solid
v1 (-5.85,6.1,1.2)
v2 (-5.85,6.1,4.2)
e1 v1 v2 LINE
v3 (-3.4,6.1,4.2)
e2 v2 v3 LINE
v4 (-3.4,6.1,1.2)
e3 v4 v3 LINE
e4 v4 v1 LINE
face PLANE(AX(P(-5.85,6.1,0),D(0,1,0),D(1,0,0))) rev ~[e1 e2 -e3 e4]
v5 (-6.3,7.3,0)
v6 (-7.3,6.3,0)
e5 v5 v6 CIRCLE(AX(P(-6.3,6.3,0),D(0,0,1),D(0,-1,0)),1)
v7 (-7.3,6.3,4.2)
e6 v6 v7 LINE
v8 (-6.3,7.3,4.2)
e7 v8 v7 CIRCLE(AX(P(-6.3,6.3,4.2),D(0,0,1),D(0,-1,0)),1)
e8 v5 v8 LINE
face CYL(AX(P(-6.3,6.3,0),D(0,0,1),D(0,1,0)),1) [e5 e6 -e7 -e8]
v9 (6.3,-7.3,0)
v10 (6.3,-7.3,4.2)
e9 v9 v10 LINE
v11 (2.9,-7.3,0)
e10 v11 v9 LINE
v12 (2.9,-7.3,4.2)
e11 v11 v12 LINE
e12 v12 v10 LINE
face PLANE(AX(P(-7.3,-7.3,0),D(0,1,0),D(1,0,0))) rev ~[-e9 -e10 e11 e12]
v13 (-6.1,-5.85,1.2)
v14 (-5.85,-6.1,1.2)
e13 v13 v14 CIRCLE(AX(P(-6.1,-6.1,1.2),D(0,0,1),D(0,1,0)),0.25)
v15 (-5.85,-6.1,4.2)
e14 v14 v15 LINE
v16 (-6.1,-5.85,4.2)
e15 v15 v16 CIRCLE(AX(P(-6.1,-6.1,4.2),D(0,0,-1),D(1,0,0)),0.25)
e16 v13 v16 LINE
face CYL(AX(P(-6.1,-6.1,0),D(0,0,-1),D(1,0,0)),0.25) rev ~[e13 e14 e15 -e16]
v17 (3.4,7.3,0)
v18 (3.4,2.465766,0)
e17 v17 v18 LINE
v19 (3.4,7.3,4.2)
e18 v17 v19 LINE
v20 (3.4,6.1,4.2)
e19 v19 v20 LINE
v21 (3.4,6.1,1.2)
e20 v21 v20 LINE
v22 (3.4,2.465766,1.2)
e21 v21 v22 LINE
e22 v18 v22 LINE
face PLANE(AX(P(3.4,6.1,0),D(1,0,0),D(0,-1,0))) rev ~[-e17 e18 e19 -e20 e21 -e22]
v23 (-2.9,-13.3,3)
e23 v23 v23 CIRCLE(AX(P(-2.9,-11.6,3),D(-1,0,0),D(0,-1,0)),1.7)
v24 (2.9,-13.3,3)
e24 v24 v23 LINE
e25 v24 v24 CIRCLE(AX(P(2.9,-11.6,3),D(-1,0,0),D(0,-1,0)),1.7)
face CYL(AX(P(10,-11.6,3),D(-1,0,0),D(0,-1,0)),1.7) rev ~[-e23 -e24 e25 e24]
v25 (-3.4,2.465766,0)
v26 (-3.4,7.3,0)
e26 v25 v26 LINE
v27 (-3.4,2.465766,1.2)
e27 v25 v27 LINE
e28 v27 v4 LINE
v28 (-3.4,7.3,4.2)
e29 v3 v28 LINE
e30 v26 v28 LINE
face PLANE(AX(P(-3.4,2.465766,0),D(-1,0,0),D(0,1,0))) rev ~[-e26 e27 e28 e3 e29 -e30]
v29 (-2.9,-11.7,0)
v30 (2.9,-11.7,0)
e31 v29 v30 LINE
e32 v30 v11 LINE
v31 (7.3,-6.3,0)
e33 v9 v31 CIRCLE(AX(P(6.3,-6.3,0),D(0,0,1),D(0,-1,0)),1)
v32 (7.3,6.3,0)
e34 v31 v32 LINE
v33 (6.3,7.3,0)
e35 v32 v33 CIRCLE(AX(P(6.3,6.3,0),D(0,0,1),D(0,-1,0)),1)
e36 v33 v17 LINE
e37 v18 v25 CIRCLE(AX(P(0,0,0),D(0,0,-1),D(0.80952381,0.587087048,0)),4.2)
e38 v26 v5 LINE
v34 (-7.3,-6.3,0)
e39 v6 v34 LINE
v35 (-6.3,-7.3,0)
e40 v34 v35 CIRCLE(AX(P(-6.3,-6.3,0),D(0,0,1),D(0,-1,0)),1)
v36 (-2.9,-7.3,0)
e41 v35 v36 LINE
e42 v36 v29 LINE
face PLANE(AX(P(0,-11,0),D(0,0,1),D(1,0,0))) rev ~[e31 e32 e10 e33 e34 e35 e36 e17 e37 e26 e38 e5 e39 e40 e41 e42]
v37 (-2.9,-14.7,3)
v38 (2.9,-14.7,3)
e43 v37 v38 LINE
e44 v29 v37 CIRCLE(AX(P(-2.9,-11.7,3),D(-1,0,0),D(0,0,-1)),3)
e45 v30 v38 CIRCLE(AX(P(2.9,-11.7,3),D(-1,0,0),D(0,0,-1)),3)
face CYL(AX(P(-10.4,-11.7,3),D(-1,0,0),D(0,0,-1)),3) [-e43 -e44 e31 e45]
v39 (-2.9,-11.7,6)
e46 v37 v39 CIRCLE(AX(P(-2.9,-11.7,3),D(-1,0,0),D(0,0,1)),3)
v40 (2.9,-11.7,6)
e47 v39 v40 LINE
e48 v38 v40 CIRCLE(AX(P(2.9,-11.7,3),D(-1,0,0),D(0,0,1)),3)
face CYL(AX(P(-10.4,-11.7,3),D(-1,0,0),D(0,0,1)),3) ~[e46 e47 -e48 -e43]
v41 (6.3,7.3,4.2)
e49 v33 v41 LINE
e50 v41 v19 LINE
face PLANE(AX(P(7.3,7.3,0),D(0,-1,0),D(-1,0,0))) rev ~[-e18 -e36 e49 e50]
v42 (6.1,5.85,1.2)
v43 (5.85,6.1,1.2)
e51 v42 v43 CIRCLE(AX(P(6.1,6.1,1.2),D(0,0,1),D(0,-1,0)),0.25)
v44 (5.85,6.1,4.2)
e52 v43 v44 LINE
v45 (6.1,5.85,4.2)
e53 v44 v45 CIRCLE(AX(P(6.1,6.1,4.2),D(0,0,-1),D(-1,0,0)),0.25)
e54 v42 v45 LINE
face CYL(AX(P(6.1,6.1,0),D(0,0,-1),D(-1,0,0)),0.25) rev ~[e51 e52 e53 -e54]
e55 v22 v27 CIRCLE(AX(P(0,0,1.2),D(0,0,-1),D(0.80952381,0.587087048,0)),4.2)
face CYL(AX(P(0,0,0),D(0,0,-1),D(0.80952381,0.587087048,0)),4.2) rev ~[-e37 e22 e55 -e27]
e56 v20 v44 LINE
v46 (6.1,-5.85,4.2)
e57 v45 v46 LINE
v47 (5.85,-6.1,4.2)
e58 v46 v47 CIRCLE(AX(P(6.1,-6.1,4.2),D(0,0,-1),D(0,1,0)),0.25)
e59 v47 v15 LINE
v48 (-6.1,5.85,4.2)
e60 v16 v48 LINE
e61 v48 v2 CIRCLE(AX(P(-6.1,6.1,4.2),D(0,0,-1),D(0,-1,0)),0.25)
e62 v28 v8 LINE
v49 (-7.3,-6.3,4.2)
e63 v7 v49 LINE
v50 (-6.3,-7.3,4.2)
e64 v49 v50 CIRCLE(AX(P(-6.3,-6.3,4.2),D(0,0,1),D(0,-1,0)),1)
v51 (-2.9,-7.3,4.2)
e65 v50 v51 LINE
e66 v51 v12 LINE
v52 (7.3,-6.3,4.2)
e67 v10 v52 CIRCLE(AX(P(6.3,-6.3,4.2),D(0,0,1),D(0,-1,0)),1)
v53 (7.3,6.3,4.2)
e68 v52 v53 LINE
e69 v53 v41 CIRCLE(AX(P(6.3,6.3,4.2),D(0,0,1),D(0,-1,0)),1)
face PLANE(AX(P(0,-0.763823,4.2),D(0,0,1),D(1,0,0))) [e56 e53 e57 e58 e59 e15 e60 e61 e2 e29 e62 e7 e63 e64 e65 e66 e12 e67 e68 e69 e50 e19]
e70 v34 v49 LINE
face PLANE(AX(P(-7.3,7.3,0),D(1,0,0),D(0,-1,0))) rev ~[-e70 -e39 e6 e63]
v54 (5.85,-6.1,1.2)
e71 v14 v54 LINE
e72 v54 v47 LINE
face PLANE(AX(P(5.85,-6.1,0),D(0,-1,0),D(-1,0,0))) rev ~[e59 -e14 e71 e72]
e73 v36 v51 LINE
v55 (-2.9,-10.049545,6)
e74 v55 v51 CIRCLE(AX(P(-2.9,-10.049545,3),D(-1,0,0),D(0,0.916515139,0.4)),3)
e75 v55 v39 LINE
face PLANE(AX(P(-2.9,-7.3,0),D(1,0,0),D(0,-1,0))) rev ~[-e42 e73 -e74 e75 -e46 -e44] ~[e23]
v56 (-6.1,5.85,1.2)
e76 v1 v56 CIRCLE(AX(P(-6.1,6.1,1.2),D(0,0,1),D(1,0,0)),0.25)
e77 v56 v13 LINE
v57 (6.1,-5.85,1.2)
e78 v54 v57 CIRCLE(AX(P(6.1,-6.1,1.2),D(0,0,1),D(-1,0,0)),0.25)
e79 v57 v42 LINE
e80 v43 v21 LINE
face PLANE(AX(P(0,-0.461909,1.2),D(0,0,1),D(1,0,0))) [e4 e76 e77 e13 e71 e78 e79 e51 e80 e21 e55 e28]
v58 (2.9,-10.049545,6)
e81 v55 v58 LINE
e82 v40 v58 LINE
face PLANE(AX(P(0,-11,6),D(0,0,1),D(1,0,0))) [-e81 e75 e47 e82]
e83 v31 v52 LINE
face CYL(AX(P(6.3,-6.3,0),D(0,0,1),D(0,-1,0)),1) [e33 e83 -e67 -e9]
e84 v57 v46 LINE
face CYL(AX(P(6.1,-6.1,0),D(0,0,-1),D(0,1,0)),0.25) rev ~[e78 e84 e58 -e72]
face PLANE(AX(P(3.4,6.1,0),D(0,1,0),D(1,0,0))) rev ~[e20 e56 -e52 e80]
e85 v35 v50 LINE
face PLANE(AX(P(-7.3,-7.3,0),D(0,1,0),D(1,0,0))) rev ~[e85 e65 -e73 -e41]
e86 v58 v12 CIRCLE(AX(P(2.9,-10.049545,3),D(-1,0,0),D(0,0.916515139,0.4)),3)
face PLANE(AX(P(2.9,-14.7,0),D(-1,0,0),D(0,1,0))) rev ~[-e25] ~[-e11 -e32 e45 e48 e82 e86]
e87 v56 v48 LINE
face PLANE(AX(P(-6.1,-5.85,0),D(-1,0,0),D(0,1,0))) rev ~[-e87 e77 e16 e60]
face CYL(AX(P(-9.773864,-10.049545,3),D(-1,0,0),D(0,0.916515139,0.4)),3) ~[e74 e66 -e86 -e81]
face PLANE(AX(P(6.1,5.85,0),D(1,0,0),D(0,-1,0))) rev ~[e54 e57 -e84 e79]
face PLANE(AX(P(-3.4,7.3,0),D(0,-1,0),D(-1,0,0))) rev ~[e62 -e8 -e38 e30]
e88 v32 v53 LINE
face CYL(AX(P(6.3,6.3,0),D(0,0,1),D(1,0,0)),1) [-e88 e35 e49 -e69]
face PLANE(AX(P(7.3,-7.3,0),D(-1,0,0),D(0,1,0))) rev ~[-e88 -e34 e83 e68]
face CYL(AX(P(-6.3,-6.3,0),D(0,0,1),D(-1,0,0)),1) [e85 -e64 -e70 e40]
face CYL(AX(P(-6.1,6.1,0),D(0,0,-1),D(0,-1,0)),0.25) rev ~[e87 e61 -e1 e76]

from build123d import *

# Parameters (mm, degrees)
F1_DEPTH    = 1.2
F2_DEPTH    = 4.2
F3_DEPTH    = 6
F6_T1_DEPTH = 20.8
F6_T3_DEPTH = 19.5477270849
F7_D        = 3.4
F7_DEPTH    = 7
F7_TIP      = 1.0214630523
F8_R        = 1


# Not quite as in the source:
# - a fillet or chamfer that OpenCascade refuses, or shapes differently, is made with other operations: its cross-section is extruded or revolved along the edge and cut away or added


with BuildPart() as f1:
    # F0 (on Top) → F1 (new body)
    with BuildSketch(Plane.XY):
        with BuildLine():
            Line((-3.4, 6.1), (-5.85, 6.1))
            ThreePointArc((-5.85, 6.1), (-6.2767766953, 6.2767766953), (-6.1, 5.85))
            Line((-6.1, 5.85), (-6.1, -5.85))
            ThreePointArc((-6.1, -5.85), (-6.2767766953, -6.2767766953), (-5.85, -6.1))
            Line((-5.85, -6.1), (5.85, -6.1))
            ThreePointArc((5.85, -6.1), (6.2767766953, -6.2767766953), (6.1, -5.85))
            Line((6.1, -5.85), (6.1, 5.85))
            ThreePointArc((6.1, 5.85), (6.2767766953, 6.2767766953), (5.85, 6.1))
            Line((5.85, 6.1), (3.4, 6.1))
            Line((3.4, 6.1), (3.4, 2.4657656012))
            ThreePointArc((3.4, 2.4657656012), (0, -4.2), (-3.4, 2.4657656012))
            Line((-3.4, 2.4657656012), (-3.4, 6.1))
        make_face()
    extrude(amount=F1_DEPTH)

    # F0 (on Top) → F2 (join)
    with BuildSketch(Plane.XY):
        with BuildLine():
            ThreePointArc((-6.1, 5.85), (-6.2767766953, 6.2767766953), (-5.85, 6.1))
            Line((-5.85, 6.1), (-3.4, 6.1))
            Line((-3.4, 6.1), (-3.4, 7.3))
            Line((-3.4, 7.3), (-7.3, 7.3))
            Line((-7.3, 7.3), (-7.3, -7.3))
            Line((-7.3, -7.3), (-2.9, -7.3))
            Line((-2.9, -7.3), (2.9, -7.3))
            Line((2.9, -7.3), (7.3, -7.3))
            Line((7.3, -7.3), (7.3, 7.3))
            Line((7.3, 7.3), (3.4, 7.3))
            Line((3.4, 7.3), (3.4, 6.1))
            Line((3.4, 6.1), (5.85, 6.1))
            ThreePointArc((5.85, 6.1), (6.2767766953, 6.2767766953), (6.1, 5.85))
            Line((6.1, 5.85), (6.1, -5.85))
            ThreePointArc((6.1, -5.85), (6.2767766953, -6.2767766953), (5.85, -6.1))
            Line((5.85, -6.1), (-5.85, -6.1))
            ThreePointArc((-5.85, -6.1), (-6.2767766953, -6.2767766953), (-6.1, -5.85))
            Line((-6.1, -5.85), (-6.1, 5.85))
        make_face()
    extrude(amount=F2_DEPTH)

    # F0 (on Top) → F3 (join)
    with BuildSketch(Plane.XY):
        Polygon((2.9, -7.3), (-2.9, -7.3), (-2.9, -14.7), (0, -14.7), (2.9, -14.7), align=None)
    extrude(amount=F3_DEPTH)

    # F6: fillet of radius 3 on 3 edges, made by hand

    # F6_s2 → F6_t1 (cut)
    with BuildSketch(Plane.YZ.offset(-10.4)):
        with BuildLine():
            ThreePointArc((-11.7, 0), (-13.8213203436, 0.8786796564), (-14.7, 3))
            Line((-14.7, 3), (-14.7, 0))
            Line((-14.7, 0), (-11.7, 0))
        make_face()
        with BuildLine():
            ThreePointArc((-11.7, 6), (-13.8213203436, 5.1213203436), (-14.7, 3))
            Line((-14.7, 3), (-14.7, 6))
            Line((-14.7, 6), (-11.7, 6))
        make_face()
    extrude(amount=F6_T1_DEPTH, mode=Mode.SUBTRACT)

    # F6_s4 → F6_t3 (cut)
    with BuildSketch(Plane.YZ.offset(-9.7738635424)):
        with BuildLine():
            ThreePointArc((-7.3, 4.2), (-8.4063777445, 5.5099800796), (-10.049545417, 6))
            Line((-10.049545417, 6), (-7.3, 6))
            Line((-7.3, 6), (-7.3, 4.2))
        make_face()
    extrude(amount=F6_T3_DEPTH, mode=Mode.SUBTRACT)

    # F7
    with Locations(Plane.YZ.offset(3)):
        with Locations((-11.6, 3)):
            Hole(F7_D / 2, depth=F7_DEPTH)
            with Locations((0, 0, -(F7_DEPTH + F7_TIP / 2))):  # 118° drill point
                Cone(0, F7_D / 2, F7_TIP, mode=Mode.SUBTRACT)

    # F8
    f8_edges = [f1.edges().sort_by_distance(p)[0] for p in [
        (-7.3, 7.3, 2.1),
        (-7.3, -7.3, 2.1),
        (7.3, 7.3, 2.1),
        (7.3, -7.3, 2.1),
    ]]
    fillet(f8_edges, radius=F8_R)


solid = f1.part
